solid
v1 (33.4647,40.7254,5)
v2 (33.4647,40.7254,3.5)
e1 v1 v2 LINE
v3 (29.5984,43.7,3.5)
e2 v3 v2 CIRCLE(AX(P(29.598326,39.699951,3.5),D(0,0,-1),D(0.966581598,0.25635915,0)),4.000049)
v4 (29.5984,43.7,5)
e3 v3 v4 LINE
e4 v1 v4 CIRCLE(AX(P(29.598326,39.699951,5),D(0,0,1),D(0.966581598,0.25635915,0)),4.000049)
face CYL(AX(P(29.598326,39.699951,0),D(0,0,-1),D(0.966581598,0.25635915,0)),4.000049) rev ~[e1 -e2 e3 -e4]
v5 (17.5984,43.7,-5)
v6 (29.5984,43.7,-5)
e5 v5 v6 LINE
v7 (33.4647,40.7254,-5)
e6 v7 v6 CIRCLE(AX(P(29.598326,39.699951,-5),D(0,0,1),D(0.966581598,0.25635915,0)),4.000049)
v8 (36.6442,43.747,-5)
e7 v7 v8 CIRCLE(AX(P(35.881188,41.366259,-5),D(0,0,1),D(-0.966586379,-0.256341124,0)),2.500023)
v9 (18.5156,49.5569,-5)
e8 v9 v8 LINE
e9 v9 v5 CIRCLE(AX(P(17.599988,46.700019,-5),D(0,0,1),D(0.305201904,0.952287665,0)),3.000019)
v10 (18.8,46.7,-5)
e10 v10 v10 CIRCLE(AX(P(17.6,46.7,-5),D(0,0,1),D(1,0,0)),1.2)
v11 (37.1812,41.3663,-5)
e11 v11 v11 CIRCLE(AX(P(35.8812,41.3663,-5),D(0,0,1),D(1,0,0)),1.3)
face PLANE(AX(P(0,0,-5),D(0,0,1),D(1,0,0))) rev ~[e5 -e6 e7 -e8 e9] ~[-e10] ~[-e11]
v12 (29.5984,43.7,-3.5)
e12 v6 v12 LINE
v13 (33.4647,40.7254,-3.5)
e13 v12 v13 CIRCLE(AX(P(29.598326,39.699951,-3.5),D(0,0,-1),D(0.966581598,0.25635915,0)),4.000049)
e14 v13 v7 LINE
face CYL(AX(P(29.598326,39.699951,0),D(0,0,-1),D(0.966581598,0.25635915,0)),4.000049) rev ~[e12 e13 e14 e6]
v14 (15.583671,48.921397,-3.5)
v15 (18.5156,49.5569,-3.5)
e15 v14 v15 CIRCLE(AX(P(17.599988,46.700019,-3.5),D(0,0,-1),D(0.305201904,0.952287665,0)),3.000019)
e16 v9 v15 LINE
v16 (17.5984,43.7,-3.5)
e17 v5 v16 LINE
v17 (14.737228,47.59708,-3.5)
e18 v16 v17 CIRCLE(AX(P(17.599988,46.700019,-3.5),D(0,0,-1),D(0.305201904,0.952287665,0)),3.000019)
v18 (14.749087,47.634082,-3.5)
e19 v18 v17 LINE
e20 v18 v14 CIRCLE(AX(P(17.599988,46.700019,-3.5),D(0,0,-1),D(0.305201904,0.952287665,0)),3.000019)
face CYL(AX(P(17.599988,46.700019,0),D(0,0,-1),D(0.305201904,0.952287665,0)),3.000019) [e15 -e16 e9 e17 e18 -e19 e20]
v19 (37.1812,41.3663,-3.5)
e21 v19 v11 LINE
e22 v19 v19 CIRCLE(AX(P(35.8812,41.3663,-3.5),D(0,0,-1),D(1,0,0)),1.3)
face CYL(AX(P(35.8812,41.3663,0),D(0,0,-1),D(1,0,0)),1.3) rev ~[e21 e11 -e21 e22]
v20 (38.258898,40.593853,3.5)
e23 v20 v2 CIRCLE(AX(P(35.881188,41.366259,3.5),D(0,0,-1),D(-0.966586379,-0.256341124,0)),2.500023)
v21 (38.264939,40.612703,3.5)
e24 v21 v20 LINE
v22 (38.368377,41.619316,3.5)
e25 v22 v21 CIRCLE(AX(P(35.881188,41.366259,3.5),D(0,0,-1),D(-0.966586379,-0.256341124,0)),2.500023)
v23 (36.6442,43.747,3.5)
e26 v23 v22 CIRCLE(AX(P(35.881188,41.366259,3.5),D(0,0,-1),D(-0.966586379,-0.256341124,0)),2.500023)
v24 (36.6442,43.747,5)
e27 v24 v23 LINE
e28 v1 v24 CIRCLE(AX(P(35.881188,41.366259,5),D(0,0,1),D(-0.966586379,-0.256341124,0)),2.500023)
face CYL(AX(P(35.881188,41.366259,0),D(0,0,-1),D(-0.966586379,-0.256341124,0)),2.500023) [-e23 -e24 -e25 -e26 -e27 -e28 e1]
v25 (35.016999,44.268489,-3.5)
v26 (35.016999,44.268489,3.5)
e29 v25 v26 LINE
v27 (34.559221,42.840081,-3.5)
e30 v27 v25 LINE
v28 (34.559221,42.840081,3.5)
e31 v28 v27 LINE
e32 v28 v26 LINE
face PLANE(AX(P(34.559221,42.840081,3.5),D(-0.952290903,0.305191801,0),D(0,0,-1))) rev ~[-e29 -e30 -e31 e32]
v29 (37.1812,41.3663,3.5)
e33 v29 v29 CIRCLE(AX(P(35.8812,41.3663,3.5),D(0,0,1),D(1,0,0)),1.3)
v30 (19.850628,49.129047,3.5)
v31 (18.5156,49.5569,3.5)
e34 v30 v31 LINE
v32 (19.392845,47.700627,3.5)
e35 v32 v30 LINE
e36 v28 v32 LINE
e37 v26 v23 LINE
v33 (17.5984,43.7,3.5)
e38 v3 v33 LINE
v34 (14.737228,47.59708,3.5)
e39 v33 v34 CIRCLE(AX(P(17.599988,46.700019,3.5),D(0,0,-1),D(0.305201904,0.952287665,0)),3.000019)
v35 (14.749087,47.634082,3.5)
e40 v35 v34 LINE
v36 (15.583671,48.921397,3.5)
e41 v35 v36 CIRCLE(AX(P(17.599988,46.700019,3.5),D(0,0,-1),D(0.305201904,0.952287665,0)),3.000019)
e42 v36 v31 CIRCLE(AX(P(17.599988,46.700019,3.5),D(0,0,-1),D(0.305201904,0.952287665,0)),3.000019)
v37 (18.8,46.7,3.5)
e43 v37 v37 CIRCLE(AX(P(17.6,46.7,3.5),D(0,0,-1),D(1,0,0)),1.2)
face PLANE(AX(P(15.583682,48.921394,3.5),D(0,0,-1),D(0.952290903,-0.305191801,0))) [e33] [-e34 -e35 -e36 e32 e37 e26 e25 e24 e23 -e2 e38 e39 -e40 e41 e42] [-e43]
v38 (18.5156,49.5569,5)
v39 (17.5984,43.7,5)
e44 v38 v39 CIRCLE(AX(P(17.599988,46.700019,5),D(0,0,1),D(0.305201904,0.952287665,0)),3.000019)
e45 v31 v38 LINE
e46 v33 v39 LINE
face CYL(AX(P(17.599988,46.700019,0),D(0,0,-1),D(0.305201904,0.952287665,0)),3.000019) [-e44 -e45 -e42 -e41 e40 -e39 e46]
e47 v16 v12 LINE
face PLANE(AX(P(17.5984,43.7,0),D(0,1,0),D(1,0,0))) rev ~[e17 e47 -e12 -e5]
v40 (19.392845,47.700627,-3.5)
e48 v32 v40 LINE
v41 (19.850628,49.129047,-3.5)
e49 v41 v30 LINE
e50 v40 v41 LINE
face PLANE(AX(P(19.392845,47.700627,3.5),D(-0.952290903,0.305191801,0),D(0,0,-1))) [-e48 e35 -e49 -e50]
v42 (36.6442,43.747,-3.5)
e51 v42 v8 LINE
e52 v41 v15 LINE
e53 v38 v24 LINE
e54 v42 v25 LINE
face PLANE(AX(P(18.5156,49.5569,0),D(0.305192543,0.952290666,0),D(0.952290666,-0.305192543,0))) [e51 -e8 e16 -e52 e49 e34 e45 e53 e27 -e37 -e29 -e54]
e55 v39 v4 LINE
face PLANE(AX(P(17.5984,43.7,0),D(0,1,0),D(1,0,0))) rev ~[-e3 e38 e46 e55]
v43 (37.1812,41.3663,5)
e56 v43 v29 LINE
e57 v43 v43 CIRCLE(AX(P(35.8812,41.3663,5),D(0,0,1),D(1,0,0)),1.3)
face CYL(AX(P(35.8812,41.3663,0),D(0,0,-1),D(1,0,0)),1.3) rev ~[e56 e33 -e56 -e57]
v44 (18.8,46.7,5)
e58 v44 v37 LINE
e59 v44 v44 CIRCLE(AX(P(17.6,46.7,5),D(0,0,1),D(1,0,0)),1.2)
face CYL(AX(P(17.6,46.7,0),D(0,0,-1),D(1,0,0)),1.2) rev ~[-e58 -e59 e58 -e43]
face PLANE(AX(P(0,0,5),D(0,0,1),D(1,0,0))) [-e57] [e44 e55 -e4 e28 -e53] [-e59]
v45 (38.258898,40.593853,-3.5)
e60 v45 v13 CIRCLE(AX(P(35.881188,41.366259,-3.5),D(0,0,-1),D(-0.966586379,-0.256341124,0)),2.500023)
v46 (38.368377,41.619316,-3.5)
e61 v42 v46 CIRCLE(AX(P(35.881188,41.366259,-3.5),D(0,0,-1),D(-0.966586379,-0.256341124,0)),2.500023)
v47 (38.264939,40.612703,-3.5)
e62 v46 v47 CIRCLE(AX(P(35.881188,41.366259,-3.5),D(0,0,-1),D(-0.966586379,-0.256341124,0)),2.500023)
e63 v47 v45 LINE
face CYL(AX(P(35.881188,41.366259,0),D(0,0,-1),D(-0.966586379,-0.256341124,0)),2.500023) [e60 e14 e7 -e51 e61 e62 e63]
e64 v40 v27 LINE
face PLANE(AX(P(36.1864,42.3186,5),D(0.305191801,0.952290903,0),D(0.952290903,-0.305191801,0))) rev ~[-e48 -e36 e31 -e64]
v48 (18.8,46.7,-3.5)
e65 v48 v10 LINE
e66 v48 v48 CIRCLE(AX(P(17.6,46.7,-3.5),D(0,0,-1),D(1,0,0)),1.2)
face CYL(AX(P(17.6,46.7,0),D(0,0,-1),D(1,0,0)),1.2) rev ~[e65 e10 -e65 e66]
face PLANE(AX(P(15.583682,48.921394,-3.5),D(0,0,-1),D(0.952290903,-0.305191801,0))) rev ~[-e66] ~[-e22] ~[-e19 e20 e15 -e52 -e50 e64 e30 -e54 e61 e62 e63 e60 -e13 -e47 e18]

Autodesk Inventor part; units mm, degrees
ref_plane "YZ Plane" through (0, 0, 0) normal (1, 0, 0) x (0, 1, 0)
ref_plane "XZ Plane" through (0, 0, 0) normal (0, 1, 0) x (-1, 0, 0)
sketch "Sketch1" plane through (0, 0, 0) normal (0, 0, 1) x (1, 0, 0)
  circle A0 centre (17.6, 46.7) radius 1.2
  circle A1 centre (35.8812, 41.3663) radius 1.3
  arc A2 (18.5156, 49.5569) -> (17.5984, 43.7) centre (17.6, 46.7) ccw
  arc A3 (33.4647, 40.7254) -> (36.6442, 43.747) centre (35.8812, 41.3663) ccw
  line L0 (18.5156, 49.5569) -> (36.6442, 43.747)
  line L1 (17.5984, 43.7) -> (29.5984, 43.7)
  arc A4 (33.4647, 40.7254) -> (29.5984, 43.7) centre (29.5984, 39.7) ccw
  point P0 (0, 0)
  dimension "d0" = 5
  dimension "d1" = 3
  dimension "d3" = 4
  dimension "d14" = 12
extrude "Extrusion1" add sketch "Sketch1" along normal mid plane 10
ref_plane "Work Plane1" through (36.1864, 42.3186, 5) normal (0.3051918, 0.9522909, 0) x (0.9522909, -0.3051918, 0)
sketch "Sketch2" plane through (36.1864, 42.3186, 5) normal (0.3051918, 0.9522909, 0) x (0.9522909, -0.3051918, 0)
  line L0 (8.5468, 5) -> (-28.0353, 5) projected
  line L1 (-22.0368, 8.5) -> (2.5, 8.5)
  line L2 (2.5, 8.5) -> (2.5, 1.5)
  line L3 (2.5, 1.5) -> (-22.0368, 1.5)
  line L4 (-22.0368, 1.5) -> (-22.0368, 8.5)
  line L5 (2.5, 10) -> (2.5, 0) projected
  line L6 (-22.0368, 10) -> (-22.0368, 0) projected
  point P0 (-21.5447, 5)
  dimension "d7" = 7
extrude "Extrusion2" cut sketch "Sketch2" against normal through all
sketch "Sketch3" plane through (36.1864, 42.3186, 5) normal (-0.3051918, -0.9522909, 0) x (0.9522909, -0.3051918, 0)
  line L0 (-21.6349, -8.5) -> (-21.6349, -1.5) projected
  line L1 (-21.6349, -8.5) -> (2.2913, -8.5) projected
  line L2 (2.2913, -1.5) -> (2.2913, -8.5) projected
  line L3 (-21.6349, -1.5) -> (-17.6349, -1.5)
  line L4 (-17.6349, -1.5) -> (-17.6349, -8.5)
  line L5 (-17.6349, -8.5) -> (-21.6349, -8.5)
  line L6 (-21.6349, -8.5) -> (-21.6349, -1.5)
  line L7 (2.2913, -1.5) -> (-1.7087, -1.5)
  line L8 (-1.7087, -1.5) -> (-1.7087, -8.5)
  line L9 (-1.7087, -8.5) -> (2.2913, -8.5)
  line L10 (2.2913, -8.5) -> (2.2913, -1.5)
  point P0 (-21.5447, -5)
  dimension "d10" = 4
  dimension "d11" = 4
extrude "Extrusion3" cut sketch "Sketch3" against normal through all
properties part number "Lever for inset hinge" material "Steel"
